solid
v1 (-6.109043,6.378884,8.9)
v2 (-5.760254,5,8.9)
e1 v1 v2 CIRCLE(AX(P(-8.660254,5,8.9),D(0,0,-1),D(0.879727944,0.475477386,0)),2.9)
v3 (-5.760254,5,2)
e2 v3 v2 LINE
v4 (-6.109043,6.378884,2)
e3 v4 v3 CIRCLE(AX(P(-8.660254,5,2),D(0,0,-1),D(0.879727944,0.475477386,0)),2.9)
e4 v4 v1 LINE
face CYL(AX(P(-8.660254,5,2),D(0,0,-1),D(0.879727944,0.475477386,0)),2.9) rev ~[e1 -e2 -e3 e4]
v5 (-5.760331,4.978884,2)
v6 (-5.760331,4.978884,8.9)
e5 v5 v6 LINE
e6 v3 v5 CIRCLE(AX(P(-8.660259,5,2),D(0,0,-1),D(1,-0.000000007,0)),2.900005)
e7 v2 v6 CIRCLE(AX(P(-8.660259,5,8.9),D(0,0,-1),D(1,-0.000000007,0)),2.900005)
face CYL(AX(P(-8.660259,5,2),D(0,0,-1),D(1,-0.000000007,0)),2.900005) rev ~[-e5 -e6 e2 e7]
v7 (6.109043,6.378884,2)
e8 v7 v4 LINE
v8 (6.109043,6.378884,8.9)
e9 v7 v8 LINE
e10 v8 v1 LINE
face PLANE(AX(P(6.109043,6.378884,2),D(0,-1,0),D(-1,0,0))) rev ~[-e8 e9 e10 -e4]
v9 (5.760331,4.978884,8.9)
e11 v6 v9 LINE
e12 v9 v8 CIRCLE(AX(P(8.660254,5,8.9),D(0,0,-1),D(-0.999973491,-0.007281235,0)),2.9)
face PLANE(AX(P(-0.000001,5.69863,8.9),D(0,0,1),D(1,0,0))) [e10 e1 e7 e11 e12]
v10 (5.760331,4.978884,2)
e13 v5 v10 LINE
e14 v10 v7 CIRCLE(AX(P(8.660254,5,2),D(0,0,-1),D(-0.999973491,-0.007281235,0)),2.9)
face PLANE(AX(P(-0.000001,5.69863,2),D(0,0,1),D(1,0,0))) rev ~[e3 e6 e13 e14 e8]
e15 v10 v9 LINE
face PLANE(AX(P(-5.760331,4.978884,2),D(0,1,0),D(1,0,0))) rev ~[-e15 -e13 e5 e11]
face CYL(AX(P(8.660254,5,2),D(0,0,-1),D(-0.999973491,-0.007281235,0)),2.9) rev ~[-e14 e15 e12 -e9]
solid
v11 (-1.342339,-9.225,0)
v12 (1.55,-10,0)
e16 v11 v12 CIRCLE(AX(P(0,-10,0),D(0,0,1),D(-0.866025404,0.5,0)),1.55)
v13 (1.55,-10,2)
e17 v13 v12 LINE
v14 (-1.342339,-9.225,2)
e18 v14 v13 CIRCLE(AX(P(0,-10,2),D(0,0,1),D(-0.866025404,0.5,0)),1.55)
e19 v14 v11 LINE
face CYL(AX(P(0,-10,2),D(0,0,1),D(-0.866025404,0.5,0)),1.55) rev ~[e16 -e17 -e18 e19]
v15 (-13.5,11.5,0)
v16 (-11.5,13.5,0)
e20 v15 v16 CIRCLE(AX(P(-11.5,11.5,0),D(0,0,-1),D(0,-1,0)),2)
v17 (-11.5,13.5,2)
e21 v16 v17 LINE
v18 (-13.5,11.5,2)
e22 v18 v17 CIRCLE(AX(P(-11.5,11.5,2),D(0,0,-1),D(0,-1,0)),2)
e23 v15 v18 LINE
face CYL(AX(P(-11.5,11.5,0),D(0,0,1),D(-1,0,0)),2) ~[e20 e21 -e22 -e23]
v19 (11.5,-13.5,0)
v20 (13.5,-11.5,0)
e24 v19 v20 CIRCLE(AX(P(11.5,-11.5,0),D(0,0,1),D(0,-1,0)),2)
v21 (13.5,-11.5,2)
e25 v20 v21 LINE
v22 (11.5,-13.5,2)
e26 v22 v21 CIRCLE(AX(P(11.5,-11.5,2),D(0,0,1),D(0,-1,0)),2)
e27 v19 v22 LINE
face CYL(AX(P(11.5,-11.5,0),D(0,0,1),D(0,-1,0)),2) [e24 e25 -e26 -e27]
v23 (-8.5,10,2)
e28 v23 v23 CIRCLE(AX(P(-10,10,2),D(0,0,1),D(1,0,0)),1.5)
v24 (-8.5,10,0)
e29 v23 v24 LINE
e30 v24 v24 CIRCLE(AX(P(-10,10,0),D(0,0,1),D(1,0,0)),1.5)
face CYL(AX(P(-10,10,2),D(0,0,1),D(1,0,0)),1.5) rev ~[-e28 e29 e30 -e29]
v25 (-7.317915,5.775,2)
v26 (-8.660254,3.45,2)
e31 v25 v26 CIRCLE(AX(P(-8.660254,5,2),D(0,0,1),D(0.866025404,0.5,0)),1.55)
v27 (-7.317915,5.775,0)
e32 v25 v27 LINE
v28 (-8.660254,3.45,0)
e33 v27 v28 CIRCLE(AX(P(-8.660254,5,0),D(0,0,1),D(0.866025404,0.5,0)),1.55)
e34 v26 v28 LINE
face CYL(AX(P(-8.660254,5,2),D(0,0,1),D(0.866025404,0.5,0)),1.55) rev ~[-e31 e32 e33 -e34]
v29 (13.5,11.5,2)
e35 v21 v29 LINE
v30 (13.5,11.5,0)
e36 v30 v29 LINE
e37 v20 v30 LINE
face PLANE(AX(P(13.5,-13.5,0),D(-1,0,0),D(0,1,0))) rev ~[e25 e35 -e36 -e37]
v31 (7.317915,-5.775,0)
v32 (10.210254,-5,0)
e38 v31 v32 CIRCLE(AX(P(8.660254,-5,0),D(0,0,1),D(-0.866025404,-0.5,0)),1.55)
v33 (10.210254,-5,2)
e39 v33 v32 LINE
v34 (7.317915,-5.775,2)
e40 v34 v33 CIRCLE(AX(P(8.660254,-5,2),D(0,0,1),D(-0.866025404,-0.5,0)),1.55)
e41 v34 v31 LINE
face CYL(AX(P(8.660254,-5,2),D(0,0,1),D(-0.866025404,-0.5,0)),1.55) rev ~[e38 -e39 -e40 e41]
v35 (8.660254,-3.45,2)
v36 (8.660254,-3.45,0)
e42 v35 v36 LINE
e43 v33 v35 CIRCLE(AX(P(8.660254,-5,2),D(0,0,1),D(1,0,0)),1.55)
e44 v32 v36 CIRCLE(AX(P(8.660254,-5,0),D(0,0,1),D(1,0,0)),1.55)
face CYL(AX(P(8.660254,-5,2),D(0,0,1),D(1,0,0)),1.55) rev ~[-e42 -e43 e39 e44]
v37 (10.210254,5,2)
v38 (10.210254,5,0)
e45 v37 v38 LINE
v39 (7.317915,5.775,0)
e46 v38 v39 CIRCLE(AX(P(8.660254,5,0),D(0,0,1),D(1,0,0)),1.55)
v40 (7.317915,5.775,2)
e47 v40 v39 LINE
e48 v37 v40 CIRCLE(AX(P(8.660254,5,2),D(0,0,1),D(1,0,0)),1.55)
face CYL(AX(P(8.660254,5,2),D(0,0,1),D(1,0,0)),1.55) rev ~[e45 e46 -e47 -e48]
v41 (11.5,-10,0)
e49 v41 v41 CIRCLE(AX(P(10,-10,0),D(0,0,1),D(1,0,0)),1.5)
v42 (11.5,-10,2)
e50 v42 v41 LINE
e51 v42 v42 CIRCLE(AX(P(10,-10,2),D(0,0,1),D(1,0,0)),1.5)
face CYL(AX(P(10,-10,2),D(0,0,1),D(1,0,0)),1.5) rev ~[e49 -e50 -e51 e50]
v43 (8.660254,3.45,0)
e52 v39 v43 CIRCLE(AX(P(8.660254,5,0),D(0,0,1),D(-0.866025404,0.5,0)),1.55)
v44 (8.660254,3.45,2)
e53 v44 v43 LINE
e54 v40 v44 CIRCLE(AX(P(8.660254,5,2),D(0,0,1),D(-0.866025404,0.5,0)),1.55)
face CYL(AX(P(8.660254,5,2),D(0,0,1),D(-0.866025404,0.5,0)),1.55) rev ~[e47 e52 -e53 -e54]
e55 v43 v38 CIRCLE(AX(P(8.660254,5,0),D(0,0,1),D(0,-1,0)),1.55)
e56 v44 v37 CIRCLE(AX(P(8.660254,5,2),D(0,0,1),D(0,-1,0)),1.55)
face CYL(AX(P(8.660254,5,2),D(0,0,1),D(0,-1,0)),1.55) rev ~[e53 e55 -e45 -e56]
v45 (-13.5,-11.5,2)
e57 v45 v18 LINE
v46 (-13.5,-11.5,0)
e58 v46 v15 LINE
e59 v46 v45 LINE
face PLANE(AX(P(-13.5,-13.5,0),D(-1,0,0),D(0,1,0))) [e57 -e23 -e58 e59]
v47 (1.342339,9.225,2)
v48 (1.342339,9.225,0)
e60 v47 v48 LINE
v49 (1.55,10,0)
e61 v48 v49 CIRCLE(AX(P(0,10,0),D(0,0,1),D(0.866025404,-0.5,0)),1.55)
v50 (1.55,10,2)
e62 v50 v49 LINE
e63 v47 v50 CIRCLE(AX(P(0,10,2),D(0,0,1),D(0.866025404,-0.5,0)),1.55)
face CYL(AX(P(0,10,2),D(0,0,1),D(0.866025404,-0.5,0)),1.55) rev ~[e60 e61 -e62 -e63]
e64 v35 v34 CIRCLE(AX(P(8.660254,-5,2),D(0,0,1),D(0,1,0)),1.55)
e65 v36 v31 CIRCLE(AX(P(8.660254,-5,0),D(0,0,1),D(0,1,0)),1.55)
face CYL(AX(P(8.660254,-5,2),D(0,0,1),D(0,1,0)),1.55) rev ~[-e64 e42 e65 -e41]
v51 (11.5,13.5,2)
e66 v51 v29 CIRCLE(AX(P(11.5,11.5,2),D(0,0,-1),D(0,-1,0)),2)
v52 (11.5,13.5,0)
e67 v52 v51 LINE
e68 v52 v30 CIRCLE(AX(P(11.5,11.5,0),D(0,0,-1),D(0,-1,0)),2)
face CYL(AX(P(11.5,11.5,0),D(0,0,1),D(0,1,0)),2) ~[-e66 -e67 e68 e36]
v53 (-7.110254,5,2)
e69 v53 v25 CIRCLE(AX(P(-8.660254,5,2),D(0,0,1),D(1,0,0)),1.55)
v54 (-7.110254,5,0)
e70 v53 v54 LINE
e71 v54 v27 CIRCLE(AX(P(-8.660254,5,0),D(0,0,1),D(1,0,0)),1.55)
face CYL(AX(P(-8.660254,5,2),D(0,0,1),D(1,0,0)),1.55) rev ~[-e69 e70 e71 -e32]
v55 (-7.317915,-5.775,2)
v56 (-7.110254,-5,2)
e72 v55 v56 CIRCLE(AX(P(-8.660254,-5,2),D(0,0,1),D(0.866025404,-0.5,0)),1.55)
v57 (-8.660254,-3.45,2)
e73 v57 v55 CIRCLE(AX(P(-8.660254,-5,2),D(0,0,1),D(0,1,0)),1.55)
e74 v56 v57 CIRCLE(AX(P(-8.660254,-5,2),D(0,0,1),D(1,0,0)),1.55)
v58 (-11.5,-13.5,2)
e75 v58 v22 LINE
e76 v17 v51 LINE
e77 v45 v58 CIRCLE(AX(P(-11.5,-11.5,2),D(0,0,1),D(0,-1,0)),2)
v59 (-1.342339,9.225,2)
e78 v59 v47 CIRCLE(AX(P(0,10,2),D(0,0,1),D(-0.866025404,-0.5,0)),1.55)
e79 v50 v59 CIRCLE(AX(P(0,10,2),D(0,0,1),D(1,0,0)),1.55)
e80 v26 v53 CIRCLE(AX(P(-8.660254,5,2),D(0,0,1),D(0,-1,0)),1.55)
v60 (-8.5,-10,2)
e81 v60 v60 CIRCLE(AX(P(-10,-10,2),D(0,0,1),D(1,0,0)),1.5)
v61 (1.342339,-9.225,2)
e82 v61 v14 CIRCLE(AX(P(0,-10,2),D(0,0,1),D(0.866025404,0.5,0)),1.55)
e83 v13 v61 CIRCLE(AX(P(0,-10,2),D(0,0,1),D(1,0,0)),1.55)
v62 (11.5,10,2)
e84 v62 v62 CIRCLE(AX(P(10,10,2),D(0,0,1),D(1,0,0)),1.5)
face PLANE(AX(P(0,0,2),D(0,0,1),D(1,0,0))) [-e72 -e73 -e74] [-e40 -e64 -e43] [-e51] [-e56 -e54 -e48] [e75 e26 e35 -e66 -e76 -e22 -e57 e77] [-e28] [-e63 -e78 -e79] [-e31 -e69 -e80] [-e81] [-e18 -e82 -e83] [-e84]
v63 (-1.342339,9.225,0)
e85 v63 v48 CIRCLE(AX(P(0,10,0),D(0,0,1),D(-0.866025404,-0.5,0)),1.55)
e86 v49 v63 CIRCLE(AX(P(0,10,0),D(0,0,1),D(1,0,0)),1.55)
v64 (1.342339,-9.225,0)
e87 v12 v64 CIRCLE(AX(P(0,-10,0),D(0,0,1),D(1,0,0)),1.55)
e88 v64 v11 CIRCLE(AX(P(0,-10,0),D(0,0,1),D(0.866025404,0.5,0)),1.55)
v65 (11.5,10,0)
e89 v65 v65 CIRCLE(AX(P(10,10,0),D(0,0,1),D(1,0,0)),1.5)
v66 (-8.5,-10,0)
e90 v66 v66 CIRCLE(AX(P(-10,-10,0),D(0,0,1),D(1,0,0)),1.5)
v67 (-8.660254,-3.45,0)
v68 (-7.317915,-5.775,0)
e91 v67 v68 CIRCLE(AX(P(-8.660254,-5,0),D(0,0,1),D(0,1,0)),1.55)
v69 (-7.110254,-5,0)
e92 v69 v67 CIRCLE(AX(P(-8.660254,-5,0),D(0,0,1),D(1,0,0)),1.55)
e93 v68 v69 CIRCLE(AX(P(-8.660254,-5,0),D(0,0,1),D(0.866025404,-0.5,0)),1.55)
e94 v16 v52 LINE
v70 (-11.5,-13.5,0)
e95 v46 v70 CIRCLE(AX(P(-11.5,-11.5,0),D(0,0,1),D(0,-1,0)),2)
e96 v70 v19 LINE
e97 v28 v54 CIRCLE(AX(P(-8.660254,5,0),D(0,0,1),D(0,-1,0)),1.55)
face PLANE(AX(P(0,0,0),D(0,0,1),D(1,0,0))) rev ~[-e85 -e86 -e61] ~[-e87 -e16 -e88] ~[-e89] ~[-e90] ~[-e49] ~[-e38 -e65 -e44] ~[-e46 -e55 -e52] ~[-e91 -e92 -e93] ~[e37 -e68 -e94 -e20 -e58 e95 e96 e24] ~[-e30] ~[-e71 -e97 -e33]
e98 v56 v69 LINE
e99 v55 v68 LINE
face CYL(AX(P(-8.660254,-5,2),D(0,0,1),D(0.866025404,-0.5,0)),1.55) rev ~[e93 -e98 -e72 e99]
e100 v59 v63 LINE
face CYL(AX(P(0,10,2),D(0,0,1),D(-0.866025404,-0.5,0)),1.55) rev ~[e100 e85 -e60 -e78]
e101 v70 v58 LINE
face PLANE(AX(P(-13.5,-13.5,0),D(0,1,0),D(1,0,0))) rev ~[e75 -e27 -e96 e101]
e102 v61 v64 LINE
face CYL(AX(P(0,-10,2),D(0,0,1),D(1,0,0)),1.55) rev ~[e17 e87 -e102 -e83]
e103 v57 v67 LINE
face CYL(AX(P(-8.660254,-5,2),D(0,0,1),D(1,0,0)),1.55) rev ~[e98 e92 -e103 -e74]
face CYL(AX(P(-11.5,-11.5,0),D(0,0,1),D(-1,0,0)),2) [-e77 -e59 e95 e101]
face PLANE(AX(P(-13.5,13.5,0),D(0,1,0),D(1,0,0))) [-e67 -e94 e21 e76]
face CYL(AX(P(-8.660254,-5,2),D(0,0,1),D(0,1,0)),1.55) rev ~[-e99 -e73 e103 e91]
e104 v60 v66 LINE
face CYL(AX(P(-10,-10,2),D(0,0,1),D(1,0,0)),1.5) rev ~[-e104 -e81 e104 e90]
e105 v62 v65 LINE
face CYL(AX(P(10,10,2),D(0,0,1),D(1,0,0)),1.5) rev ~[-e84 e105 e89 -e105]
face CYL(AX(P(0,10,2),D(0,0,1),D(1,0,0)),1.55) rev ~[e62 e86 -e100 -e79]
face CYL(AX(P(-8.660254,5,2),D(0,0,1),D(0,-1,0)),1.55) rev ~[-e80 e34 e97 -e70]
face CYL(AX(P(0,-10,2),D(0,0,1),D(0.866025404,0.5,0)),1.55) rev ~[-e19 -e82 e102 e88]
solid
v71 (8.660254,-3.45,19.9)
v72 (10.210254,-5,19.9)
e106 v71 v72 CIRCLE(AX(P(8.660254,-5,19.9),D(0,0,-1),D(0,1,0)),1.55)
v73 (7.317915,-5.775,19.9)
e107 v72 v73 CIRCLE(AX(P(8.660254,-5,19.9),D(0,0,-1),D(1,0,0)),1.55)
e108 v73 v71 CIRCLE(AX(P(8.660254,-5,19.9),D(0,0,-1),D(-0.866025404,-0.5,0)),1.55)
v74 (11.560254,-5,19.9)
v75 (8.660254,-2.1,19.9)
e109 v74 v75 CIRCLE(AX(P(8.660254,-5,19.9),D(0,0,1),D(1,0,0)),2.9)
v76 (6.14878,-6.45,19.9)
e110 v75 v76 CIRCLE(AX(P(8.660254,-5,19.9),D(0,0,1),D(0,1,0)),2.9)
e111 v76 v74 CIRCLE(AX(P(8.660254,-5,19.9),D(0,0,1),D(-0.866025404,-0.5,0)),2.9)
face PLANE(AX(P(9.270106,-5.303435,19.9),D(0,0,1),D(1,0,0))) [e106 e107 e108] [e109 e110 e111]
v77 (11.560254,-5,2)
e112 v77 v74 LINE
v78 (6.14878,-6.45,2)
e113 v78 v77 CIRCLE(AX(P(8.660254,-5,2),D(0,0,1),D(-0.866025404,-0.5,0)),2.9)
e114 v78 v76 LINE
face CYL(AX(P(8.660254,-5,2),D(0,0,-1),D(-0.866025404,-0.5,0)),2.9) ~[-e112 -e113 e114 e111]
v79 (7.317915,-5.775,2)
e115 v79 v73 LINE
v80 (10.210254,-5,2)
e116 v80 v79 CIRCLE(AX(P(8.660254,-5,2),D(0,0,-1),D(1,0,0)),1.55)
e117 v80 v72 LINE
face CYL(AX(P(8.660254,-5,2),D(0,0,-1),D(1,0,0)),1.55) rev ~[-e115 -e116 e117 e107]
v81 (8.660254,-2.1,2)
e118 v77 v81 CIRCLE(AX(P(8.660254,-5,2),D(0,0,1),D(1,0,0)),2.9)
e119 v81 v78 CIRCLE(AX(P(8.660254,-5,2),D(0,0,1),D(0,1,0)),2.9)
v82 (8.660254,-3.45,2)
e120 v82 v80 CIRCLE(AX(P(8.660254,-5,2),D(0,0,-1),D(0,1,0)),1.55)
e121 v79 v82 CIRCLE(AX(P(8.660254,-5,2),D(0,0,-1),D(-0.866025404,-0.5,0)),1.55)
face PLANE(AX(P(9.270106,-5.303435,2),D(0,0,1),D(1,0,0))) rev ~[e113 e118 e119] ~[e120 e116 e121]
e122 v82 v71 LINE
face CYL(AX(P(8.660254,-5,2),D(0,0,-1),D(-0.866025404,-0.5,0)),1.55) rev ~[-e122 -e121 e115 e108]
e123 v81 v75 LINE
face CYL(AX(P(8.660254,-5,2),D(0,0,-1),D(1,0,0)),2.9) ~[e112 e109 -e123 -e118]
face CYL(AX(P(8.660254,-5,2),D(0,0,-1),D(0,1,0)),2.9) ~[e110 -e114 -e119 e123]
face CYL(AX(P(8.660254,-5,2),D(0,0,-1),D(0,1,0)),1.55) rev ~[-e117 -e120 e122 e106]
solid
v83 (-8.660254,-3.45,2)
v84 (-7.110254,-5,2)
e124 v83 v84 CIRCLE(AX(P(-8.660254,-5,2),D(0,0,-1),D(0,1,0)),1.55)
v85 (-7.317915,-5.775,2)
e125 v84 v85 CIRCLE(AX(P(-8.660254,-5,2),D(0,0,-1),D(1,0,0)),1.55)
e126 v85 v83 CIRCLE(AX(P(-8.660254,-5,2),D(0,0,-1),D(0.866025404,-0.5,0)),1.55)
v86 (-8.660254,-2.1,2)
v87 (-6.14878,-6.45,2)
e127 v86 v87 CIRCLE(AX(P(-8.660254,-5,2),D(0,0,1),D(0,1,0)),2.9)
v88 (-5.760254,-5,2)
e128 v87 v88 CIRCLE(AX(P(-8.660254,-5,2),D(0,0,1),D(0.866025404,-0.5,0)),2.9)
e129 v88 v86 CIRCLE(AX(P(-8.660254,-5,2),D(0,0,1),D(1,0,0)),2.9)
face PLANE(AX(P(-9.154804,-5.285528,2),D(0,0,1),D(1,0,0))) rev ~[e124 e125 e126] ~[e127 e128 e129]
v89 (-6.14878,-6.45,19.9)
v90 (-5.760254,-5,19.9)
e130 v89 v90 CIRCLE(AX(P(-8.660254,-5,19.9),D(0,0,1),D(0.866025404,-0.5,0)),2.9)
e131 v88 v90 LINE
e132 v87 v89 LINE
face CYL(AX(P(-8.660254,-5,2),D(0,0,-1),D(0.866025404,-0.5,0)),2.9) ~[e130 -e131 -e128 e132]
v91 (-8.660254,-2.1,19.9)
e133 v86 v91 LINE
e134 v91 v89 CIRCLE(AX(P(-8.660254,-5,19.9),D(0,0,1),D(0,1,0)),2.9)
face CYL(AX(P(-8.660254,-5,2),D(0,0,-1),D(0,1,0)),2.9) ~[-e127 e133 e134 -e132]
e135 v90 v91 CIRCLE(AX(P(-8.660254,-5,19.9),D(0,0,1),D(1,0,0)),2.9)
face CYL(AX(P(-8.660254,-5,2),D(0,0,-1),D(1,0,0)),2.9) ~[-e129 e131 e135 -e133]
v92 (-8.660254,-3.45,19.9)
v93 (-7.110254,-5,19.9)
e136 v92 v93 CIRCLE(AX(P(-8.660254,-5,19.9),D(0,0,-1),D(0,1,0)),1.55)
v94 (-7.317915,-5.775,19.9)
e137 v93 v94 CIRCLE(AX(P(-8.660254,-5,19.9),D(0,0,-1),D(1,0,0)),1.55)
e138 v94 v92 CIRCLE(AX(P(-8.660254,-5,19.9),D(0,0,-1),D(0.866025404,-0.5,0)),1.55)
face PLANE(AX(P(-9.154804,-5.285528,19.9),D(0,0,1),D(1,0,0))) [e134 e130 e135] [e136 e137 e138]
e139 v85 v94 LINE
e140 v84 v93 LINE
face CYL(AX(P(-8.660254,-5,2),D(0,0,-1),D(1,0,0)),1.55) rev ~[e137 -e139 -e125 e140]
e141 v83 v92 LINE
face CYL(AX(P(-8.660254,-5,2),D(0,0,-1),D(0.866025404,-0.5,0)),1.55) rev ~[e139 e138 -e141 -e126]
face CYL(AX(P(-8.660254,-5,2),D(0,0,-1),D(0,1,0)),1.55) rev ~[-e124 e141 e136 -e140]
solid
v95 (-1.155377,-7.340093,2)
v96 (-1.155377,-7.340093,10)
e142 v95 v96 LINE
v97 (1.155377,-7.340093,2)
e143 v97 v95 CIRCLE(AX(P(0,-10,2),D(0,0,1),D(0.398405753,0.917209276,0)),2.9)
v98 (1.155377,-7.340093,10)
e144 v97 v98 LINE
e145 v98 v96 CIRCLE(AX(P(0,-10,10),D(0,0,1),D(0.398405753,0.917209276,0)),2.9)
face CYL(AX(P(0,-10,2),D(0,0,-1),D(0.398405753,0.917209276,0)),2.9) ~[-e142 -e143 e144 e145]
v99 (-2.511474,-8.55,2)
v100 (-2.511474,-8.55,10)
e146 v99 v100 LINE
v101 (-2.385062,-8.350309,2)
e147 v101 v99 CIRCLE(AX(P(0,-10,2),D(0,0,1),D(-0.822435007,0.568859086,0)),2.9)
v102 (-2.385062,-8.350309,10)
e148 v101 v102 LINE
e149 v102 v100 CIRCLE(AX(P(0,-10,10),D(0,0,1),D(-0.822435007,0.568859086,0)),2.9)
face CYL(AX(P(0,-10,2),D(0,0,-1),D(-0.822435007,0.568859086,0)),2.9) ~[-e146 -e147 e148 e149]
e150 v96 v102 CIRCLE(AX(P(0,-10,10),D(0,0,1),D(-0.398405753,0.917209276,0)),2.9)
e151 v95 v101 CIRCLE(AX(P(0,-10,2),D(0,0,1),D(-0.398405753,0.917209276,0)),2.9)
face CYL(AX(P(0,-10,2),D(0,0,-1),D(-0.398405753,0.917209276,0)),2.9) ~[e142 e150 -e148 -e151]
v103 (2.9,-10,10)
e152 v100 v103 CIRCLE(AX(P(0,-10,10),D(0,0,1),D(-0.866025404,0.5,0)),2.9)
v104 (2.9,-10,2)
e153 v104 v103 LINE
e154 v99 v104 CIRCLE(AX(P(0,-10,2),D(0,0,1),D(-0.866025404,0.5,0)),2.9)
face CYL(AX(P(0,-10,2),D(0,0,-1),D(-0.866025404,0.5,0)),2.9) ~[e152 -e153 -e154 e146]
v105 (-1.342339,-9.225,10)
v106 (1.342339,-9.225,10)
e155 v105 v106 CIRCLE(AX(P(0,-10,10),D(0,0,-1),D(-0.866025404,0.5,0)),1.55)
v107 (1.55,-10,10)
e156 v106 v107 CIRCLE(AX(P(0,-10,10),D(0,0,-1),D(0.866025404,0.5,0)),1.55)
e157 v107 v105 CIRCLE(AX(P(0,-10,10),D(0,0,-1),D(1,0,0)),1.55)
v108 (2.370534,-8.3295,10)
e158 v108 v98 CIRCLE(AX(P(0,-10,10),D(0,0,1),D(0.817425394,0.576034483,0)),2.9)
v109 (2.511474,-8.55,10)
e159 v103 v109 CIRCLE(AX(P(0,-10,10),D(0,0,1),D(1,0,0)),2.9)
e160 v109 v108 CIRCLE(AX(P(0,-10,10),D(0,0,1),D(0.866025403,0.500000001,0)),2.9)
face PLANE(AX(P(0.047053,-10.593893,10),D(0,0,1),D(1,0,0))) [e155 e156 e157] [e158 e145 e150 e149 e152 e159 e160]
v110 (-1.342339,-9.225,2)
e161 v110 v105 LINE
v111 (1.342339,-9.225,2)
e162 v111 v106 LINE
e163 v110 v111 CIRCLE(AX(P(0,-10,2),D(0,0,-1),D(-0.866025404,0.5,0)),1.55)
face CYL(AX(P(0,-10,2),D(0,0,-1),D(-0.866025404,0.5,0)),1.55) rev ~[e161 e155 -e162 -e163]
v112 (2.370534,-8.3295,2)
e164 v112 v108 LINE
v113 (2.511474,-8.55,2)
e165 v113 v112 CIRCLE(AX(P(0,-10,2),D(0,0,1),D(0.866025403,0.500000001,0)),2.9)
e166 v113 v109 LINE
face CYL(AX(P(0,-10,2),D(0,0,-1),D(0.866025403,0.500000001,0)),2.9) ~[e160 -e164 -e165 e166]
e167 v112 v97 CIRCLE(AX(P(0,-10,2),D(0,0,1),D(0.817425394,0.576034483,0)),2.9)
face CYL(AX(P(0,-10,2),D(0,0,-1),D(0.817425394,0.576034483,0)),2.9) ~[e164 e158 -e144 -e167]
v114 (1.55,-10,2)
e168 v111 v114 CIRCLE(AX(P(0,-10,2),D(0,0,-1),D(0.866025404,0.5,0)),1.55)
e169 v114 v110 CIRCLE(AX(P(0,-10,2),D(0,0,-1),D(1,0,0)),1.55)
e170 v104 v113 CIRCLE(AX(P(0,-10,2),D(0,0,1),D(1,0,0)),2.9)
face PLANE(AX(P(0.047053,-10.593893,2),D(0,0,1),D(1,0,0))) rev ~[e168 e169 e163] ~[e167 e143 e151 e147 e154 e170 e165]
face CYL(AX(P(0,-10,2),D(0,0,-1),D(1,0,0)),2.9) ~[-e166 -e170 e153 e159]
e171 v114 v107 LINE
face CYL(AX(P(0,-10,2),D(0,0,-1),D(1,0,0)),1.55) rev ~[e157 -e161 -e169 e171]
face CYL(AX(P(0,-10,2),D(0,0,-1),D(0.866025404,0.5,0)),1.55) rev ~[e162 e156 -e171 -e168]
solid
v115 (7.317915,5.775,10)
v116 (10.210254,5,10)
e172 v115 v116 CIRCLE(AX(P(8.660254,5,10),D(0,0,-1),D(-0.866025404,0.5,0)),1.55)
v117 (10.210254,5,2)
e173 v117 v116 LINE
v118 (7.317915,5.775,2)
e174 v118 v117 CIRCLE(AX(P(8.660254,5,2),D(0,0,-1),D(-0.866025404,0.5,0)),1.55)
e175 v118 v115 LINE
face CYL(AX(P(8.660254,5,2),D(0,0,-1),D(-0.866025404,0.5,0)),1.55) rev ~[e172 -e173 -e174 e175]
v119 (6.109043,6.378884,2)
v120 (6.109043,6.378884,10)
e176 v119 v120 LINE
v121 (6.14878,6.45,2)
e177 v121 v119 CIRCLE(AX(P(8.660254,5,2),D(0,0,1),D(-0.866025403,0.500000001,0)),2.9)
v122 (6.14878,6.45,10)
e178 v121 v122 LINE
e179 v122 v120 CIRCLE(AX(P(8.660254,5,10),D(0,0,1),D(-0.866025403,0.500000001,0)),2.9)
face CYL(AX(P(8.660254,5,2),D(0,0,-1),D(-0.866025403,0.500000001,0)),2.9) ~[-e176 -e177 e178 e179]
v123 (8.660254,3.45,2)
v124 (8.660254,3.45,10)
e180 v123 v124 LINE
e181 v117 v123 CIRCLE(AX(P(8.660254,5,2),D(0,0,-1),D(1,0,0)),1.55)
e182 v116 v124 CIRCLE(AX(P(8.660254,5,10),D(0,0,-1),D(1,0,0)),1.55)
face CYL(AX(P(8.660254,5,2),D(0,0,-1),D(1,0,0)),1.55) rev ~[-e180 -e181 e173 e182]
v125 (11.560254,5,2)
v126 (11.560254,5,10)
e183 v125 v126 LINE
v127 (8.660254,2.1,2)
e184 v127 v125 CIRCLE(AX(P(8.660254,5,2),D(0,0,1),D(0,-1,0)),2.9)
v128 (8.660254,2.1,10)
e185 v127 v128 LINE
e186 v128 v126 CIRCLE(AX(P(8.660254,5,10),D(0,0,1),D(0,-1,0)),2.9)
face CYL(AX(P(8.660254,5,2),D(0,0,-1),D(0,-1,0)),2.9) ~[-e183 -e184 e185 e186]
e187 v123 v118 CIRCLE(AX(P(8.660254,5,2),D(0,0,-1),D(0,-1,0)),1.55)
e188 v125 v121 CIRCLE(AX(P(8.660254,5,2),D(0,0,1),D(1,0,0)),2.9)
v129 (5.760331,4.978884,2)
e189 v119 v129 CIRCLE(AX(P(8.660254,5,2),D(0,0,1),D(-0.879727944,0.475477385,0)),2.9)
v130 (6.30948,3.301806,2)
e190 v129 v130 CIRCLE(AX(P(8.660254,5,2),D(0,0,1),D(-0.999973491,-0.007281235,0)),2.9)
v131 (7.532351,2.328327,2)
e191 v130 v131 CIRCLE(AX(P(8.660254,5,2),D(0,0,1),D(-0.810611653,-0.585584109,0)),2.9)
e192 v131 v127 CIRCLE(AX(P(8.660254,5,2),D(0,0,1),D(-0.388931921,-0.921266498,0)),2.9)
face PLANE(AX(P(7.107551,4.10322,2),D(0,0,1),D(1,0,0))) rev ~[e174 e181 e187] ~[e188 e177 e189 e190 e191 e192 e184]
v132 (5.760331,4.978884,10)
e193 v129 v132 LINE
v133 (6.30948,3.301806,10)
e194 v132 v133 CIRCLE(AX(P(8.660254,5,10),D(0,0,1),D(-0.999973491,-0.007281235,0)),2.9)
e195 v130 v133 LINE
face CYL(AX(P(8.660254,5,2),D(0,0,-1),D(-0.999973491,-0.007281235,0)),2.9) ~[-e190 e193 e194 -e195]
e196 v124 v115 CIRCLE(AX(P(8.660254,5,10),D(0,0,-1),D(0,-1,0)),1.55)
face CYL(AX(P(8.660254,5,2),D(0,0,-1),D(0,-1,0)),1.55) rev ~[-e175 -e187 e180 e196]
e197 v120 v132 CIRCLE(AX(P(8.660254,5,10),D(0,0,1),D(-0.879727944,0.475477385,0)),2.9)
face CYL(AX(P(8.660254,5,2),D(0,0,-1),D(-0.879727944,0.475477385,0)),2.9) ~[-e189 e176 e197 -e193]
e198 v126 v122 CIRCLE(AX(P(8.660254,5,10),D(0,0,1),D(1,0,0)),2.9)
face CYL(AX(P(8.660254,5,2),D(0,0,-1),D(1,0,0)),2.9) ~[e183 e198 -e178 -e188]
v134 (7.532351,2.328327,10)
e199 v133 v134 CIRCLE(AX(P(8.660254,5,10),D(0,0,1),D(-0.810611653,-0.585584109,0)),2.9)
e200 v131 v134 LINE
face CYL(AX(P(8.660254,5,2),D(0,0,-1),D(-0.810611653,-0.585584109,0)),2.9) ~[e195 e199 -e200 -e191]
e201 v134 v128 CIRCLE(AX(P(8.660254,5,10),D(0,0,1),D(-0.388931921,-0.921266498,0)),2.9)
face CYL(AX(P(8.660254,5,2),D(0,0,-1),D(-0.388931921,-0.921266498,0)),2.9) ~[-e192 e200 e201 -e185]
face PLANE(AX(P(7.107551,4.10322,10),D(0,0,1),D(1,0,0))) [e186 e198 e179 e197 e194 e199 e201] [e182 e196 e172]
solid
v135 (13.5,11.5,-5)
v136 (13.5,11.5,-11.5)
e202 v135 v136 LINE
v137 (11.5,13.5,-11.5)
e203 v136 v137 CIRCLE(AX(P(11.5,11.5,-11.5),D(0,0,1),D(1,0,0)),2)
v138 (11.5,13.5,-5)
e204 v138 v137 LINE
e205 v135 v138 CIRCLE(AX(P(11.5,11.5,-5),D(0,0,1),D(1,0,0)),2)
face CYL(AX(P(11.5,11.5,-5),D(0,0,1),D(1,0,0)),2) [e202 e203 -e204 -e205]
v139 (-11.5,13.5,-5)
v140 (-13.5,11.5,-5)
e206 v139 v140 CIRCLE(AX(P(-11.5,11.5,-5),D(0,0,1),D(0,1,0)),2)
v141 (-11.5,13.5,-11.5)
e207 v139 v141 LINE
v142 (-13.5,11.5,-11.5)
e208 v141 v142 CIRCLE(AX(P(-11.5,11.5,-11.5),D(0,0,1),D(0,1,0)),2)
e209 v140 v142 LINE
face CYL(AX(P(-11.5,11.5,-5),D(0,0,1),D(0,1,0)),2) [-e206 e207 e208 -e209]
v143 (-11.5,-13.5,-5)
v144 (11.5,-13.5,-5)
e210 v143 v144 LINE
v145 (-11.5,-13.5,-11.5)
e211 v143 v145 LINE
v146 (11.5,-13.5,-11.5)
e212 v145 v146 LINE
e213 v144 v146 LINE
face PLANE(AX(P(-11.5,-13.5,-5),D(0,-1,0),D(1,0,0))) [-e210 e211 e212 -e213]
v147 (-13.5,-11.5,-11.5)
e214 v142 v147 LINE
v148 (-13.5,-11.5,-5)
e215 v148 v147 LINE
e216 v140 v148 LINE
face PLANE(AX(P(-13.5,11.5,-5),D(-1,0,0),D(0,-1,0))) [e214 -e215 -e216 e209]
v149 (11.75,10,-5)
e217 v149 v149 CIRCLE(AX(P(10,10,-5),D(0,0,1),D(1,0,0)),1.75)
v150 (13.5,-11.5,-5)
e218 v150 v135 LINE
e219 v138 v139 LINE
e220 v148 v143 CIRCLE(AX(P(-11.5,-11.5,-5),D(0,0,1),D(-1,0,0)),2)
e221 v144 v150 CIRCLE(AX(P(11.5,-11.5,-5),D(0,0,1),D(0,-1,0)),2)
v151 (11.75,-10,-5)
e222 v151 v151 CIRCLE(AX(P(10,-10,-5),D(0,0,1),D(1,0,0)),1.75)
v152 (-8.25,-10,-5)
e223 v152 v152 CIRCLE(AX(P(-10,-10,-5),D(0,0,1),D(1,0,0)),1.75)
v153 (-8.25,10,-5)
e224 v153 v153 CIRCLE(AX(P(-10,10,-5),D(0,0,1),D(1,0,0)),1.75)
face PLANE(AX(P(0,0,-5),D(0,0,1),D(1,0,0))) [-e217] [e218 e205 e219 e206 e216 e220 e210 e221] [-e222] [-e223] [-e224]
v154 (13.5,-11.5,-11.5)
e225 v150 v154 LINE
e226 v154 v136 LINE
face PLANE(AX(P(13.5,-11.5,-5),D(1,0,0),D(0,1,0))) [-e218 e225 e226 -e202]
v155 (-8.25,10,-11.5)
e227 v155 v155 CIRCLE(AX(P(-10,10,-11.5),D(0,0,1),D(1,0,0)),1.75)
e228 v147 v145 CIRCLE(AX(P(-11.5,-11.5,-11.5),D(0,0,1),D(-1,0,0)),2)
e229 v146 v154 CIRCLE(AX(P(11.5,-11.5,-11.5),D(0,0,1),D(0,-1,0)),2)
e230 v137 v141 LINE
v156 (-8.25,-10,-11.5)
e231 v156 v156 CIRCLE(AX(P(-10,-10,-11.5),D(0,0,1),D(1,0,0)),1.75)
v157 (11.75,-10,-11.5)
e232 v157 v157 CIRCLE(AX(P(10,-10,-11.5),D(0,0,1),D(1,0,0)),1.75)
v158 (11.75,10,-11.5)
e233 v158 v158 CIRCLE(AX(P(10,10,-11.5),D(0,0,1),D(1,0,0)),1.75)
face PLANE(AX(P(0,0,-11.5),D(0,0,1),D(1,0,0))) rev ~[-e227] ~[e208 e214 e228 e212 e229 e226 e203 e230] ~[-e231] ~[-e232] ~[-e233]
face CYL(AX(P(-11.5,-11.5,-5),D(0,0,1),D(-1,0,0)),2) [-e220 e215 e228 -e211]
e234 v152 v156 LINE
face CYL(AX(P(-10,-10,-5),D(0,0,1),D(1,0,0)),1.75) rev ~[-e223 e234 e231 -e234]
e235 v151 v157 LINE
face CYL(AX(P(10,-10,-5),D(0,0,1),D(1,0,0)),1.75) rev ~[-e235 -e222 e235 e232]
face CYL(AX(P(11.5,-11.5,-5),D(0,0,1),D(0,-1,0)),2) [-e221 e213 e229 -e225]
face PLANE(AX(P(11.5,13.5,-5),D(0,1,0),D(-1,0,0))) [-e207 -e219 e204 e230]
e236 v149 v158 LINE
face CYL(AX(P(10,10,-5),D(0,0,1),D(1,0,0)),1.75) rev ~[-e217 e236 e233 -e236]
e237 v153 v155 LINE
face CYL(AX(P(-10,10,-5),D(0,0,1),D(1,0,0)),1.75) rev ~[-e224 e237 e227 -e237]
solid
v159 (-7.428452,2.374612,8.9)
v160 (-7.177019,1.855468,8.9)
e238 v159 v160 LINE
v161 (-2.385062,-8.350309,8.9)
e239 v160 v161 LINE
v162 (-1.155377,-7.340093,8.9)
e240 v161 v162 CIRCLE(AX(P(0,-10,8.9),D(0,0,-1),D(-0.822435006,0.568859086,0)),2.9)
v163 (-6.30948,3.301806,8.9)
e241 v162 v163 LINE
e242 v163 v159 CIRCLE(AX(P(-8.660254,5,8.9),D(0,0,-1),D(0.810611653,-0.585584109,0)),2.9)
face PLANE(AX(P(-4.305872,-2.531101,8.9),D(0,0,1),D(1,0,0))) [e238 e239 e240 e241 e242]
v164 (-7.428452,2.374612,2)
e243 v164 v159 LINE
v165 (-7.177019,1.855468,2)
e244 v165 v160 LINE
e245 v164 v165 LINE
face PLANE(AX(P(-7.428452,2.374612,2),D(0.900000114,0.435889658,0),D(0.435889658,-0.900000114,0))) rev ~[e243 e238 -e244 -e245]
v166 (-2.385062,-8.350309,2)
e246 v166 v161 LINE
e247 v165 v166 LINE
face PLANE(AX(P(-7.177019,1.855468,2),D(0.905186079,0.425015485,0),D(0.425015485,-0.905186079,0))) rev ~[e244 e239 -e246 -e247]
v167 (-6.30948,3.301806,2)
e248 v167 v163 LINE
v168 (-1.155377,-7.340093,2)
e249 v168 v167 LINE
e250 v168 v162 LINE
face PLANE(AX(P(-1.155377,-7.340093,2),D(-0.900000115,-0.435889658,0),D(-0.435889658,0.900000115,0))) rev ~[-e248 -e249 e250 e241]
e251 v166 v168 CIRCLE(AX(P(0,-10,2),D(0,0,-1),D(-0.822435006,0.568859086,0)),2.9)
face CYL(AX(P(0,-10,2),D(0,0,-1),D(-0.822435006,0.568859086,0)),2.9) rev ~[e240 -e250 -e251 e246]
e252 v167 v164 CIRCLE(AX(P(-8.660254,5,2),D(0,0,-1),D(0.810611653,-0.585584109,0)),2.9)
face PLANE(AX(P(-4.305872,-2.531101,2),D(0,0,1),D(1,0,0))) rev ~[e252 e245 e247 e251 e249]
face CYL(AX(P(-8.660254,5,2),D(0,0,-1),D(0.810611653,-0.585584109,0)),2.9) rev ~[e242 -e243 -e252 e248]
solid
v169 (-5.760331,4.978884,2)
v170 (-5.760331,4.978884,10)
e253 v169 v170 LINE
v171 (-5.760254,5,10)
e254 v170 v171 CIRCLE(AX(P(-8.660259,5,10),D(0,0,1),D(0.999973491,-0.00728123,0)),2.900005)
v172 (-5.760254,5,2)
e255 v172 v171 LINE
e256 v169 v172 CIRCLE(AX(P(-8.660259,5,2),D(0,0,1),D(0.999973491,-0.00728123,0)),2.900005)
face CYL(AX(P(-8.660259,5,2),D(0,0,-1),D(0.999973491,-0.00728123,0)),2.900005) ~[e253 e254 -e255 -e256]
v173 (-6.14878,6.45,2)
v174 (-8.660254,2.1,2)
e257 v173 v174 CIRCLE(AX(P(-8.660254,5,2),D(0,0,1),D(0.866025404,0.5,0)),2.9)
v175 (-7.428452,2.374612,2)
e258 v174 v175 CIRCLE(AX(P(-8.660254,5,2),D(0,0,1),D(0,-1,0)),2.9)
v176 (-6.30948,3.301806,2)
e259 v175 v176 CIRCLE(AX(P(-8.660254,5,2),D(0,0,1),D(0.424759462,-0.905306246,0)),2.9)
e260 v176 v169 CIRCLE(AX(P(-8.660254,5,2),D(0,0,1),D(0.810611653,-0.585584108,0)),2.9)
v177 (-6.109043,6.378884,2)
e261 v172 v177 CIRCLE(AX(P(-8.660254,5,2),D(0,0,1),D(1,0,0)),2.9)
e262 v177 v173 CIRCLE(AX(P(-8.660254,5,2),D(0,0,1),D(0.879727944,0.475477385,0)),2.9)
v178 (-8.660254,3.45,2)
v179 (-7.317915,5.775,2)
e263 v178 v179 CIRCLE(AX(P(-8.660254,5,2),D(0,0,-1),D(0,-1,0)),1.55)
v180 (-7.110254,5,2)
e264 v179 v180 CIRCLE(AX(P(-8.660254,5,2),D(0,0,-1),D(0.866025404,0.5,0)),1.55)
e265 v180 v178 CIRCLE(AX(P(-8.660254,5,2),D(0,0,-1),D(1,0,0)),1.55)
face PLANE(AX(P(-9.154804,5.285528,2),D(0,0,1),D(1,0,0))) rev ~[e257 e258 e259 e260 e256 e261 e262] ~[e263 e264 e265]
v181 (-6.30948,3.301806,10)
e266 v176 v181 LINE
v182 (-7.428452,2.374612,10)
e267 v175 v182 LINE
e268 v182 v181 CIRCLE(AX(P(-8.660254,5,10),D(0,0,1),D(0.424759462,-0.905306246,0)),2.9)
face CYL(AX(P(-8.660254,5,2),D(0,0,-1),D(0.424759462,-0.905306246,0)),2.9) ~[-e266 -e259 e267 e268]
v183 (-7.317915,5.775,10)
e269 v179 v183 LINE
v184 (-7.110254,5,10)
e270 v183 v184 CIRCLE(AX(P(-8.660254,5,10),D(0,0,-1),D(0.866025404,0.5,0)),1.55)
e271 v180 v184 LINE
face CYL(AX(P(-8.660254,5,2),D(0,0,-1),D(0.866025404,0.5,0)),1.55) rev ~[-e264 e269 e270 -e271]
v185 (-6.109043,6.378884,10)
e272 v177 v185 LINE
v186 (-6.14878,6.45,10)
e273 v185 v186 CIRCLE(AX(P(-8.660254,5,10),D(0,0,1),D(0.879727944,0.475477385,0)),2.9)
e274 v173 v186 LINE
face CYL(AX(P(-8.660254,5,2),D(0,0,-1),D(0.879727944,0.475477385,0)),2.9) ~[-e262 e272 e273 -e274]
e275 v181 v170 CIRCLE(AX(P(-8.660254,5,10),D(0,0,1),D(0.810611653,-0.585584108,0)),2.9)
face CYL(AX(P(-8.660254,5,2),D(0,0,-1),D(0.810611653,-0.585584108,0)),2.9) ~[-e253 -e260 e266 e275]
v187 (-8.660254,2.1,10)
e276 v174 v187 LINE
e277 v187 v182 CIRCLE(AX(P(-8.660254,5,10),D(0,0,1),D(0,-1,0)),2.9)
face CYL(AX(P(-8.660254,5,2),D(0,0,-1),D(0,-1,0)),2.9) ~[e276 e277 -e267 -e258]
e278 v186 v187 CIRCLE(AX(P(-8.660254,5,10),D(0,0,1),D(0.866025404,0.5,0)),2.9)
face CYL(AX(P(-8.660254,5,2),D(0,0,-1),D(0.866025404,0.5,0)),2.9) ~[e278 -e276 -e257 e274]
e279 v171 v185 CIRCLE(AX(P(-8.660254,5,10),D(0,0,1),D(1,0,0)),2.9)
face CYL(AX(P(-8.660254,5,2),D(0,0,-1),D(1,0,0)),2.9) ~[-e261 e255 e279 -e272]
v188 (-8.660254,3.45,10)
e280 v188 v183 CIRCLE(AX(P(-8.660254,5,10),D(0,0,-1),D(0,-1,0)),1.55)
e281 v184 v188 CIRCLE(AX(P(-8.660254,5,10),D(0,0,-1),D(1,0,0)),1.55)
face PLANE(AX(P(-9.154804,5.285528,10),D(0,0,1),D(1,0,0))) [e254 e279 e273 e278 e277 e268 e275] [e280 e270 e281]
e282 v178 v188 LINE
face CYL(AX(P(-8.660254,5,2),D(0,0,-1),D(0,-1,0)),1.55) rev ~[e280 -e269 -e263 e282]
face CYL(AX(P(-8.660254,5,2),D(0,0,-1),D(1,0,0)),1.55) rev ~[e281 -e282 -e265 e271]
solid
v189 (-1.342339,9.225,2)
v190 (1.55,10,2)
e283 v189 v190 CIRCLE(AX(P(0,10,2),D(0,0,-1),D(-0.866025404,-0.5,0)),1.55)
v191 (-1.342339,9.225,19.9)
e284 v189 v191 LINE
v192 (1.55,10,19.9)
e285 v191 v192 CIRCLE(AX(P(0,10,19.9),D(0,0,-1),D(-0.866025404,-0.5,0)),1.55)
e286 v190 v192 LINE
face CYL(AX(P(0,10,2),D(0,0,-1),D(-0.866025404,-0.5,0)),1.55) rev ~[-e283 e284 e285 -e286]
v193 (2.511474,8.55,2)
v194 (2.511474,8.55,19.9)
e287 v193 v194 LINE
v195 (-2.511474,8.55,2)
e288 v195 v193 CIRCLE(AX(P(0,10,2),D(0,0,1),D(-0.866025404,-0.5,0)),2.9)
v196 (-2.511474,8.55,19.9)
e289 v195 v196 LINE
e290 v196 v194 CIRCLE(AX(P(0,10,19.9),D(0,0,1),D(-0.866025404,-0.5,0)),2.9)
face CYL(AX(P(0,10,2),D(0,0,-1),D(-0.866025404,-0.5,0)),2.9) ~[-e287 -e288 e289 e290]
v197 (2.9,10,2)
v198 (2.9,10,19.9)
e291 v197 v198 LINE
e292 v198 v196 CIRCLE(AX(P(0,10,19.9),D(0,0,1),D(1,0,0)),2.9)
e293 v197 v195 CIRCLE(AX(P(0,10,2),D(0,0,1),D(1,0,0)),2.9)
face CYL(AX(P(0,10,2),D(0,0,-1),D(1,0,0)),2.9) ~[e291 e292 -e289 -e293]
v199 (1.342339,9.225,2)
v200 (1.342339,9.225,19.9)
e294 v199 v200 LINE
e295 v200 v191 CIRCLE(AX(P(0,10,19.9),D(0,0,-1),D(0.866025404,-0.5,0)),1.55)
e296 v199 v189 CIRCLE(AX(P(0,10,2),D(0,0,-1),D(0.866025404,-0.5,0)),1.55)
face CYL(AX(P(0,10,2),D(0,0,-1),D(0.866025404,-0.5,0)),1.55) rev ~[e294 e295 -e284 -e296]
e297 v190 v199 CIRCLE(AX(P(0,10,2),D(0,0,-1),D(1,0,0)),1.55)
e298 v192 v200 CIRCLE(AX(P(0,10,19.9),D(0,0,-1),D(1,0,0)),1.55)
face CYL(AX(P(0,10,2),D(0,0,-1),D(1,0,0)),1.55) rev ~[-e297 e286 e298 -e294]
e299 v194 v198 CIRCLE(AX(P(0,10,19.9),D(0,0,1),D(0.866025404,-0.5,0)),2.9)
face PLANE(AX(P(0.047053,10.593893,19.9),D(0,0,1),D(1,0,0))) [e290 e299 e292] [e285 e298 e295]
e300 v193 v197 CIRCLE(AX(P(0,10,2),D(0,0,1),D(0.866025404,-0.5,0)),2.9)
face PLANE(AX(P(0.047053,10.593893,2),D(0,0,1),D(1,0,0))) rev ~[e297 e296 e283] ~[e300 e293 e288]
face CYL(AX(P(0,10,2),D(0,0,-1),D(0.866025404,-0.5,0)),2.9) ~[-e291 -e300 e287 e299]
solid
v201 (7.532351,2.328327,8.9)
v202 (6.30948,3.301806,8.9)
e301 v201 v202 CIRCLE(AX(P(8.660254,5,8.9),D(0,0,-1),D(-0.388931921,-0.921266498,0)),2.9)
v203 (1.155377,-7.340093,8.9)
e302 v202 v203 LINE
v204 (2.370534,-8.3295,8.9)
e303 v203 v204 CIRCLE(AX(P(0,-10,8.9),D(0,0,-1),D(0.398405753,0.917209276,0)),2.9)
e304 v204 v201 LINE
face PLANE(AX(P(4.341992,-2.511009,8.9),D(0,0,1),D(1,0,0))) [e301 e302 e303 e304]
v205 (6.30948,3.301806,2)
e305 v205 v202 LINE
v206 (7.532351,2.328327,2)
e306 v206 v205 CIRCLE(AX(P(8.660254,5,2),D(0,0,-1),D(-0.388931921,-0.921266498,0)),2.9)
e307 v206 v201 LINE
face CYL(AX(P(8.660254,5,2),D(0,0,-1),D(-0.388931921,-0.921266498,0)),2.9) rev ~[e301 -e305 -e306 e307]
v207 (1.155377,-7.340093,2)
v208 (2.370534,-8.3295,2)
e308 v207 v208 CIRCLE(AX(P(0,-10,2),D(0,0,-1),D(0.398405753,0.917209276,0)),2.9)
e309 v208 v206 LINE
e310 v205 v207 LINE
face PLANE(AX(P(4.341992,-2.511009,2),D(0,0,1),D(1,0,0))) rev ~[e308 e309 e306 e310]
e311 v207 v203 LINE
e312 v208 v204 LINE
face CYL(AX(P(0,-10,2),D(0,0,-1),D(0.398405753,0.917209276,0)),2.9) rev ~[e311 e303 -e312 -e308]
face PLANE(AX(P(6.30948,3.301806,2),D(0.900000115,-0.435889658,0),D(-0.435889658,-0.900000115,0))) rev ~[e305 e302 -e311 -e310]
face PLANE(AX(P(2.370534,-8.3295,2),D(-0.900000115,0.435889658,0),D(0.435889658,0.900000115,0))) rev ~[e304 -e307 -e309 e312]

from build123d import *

# Parameters (mm, degrees)
F0_W      = 27
F0_H      = 27
F1_DEPTH  = 2
F2_R      = 1.5
F3_DEPTH  = 5
F4_R      = 2
F7_DEPTH  = 17.9
F8_DEPTH  = 8
F9_DEPTH  = 2
F11_DEPTH = 6.9
F13_R     = 1.75
F14_DEPTH = 6.5


# Not quite as in the source:
# - the program builds the solid bodies; features that only make, move or delete a surface that nothing else refers to are left out


with BuildPart() as f1:
    # F0 (on Top) → F1 (new body)
    with BuildSketch(Plane.XY):
        Rectangle(F0_W, F0_H)
    extrude(amount=F1_DEPTH)

    # F2 (on face) → F3 (cut)
    with BuildSketch(Plane.XY.offset(2)):
        with Locations((-10, 10)):
            Circle(F2_R)
        with Locations((10, 10)):
            Circle(F2_R)
        with Locations((10, -10)):
            Circle(F2_R)
        with Locations((-10, -10)):
            Circle(F2_R)
    extrude(amount=-F3_DEPTH, mode=Mode.SUBTRACT)

    # F4
    f4_edges = [f1.edges().sort_by_distance(p)[0] for p in [
        (13.5, -13.5, 1),
        (-13.5, 13.5, 1),
        (13.5, 13.5, 1),
        (-13.5, -13.5, 1),
    ]]
    fillet(f4_edges, radius=F4_R)

    # F6 (on face) → F9 (cut)
    with BuildSketch(Plane.XY.offset(2)):
        with BuildLine():
            Line((8.6602540378, -5), (7.317914662, -5.775))
            ThreePointArc((7.317914662, -5.775), (9.0614235578, -6.4971850307), (10.2102540378, -5))
            ThreePointArc((10.2102540378, -5), (9.7562695487, -3.9039844892), (8.6602540378, -3.45))
            Line((8.6602540378, -3.45), (8.6602540378, -5))
        make_face()
        with BuildLine():
            ThreePointArc((8.6602540378, -3.45), (7.317914662, -4.225), (7.317914662, -5.775))
            Line((7.317914662, -5.775), (8.6602540378, -5))
            Line((8.6602540378, -5), (8.6602540378, -3.45))
        make_face()
        with BuildLine():
            ThreePointArc((1.55, 10), (-0.4011695199, 11.4971850307), (-1.3423393759, 9.225))
            Line((-1.3423393759, 9.225), (0, 10))
            Line((0, 10), (1.3423393759, 9.225))
            ThreePointArc((1.3423393759, 9.225), (1.4971850307, 9.5988304801), (1.55, 10))
        make_face()
        with BuildLine():
            Line((0, 10), (-1.3423393759, 9.225))
            ThreePointArc((-1.3423393759, 9.225), (0, 8.45), (1.3423393759, 9.225))
            Line((1.3423393759, 9.225), (0, 10))
        make_face()
        with BuildLine():
            ThreePointArc((7.317914662, 5.775), (7.317914662, 4.225), (8.6602540378, 3.45))
            Line((8.6602540378, 3.45), (8.6602540378, 5))
            Line((8.6602540378, 5), (7.317914662, 5.775))
        make_face()
        with BuildLine():
            Line((8.6602540378, 5), (8.6602540378, 3.45))
            ThreePointArc((8.6602540378, 3.45), (9.7562695487, 3.9039844892), (10.2102540378, 5))
            ThreePointArc((10.2102540378, 5), (9.0614235578, 6.4971850307), (7.317914662, 5.775))
            Line((7.317914662, 5.775), (8.6602540378, 5))
        make_face()
        with BuildLine():
            ThreePointArc((-7.317914662, 5.775), (-10.0025934137, 5.775), (-8.6602540378, 3.45))
            Line((-8.6602540378, 3.45), (-8.6602540378, 5))
            Line((-8.6602540378, 5), (-7.317914662, 5.775))
        make_face()
        with BuildLine():
            Line((-8.6602540378, 5), (-8.6602540378, 3.45))
            ThreePointArc((-8.6602540378, 3.45), (-7.564238527, 3.9039844892), (-7.1102540378, 5))
            ThreePointArc((-7.1102540378, 5), (-7.1630690071, 5.4011695199), (-7.317914662, 5.775))
            Line((-7.317914662, 5.775), (-8.6602540378, 5))
        make_face()
        with BuildLine():
            ThreePointArc((-8.6602540378, -3.45), (-10.0025934137, -5.775), (-7.317914662, -5.775))
            Line((-7.317914662, -5.775), (-8.6602540378, -5))
            Line((-8.6602540378, -5), (-8.6602540378, -3.45))
        make_face()
        with BuildLine():
            Line((-8.6602540378, -5), (-7.317914662, -5.775))
            ThreePointArc((-7.317914662, -5.775), (-7.1630690071, -5.4011695199), (-7.1102540378, -5))
            ThreePointArc((-7.1102540378, -5), (-7.564238527, -3.9039844892), (-8.6602540378, -3.45))
            Line((-8.6602540378, -3.45), (-8.6602540378, -5))
        make_face()
        with BuildLine():
            Line((-1.3423393759, -9.225), (0, -10))
            Line((0, -10), (1.3423393759, -9.225))
            ThreePointArc((1.3423393759, -9.225), (0, -8.45), (-1.3423393759, -9.225))
        make_face()
        with BuildLine():
            Line((1.3423393759, -9.225), (0, -10))
            Line((0, -10), (-1.3423393759, -9.225))
            ThreePointArc((-1.3423393759, -9.225), (-0.4011695199, -11.4971850307), (1.55, -10))
            ThreePointArc((1.55, -10), (1.4971850307, -9.5988304801), (1.3423393759, -9.225))
        make_face()
    extrude(amount=-F9_DEPTH, mode=Mode.SUBTRACT)


with BuildPart() as f7:
    # F6 (on face) → F7 (new body)
    with BuildSketch(Plane.XY.offset(2)):
        with BuildLine():
            ThreePointArc((2.9, 10), (-0.7505752308, 12.8011848962), (-2.511473671, 8.55))
            Line((-2.511473671, 8.55), (-1.3423393759, 9.225))
            ThreePointArc((-1.3423393759, 9.225), (-0.4011695199, 11.4971850307), (1.55, 10))
            ThreePointArc((1.55, 10), (1.4971850307, 9.5988304801), (1.3423393759, 9.225))
            Line((1.3423393759, 9.225), (2.511473671, 8.55))
            ThreePointArc((2.511473671, 8.55), (2.8011848962, 9.2494247692), (2.9, 10))
        make_face()
        with BuildLine():
            Line((-1.3423393759, 9.225), (-2.511473671, 8.55))
            ThreePointArc((-2.511473671, 8.55), (0, 7.1), (2.511473671, 8.55))
            Line((2.511473671, 8.55), (1.3423393759, 9.225))
            ThreePointArc((1.3423393759, 9.225), (0, 8.45), (-1.3423393759, 9.225))
        make_face()
    extrude(amount=F7_DEPTH)


with BuildPart() as f7b:
    # F6 (on face) → F7, piece 2 (new body)
    with BuildSketch(Plane.XY.offset(2)):
        with BuildLine():
            Line((7.317914662, -5.775), (6.1487803669, -6.45))
            ThreePointArc((6.1487803669, -6.45), (9.4108292686, -7.8011848962), (11.5602540378, -5))
            ThreePointArc((11.5602540378, -5), (10.7108637033, -2.9493903346), (8.6602540378, -2.1))
            Line((8.6602540378, -2.1), (8.6602540378, -3.45))
            ThreePointArc((8.6602540378, -3.45), (9.7562695487, -3.9039844892), (10.2102540378, -5))
            ThreePointArc((10.2102540378, -5), (9.0614235578, -6.4971850307), (7.317914662, -5.775))
        make_face()
        with BuildLine():
            ThreePointArc((8.6602540378, -2.1), (6.1487803669, -3.55), (6.1487803669, -6.45))
            Line((6.1487803669, -6.45), (7.317914662, -5.775))
            ThreePointArc((7.317914662, -5.775), (7.317914662, -4.225), (8.6602540378, -3.45))
            Line((8.6602540378, -3.45), (8.6602540378, -2.1))
        make_face()
    extrude(amount=F7_DEPTH)


with BuildPart() as f7c:
    # F6 (on face) → F7, piece 3 (new body)
    with BuildSketch(Plane.XY.offset(2)):
        with BuildLine():
            ThreePointArc((-8.6602540378, -2.1), (-11.1717277088, -6.45), (-6.1487803669, -6.45))
            Line((-6.1487803669, -6.45), (-7.317914662, -5.775))
            ThreePointArc((-7.317914662, -5.775), (-10.0025934137, -5.775), (-8.6602540378, -3.45))
            Line((-8.6602540378, -3.45), (-8.6602540378, -2.1))
        make_face()
        with BuildLine():
            Line((-7.317914662, -5.775), (-6.1487803669, -6.45))
            ThreePointArc((-6.1487803669, -6.45), (-5.8590691416, -5.7505752308), (-5.7602540378, -5))
            ThreePointArc((-5.7602540378, -5), (-6.6096443724, -2.9493903346), (-8.6602540378, -2.1))
            Line((-8.6602540378, -2.1), (-8.6602540378, -3.45))
            ThreePointArc((-8.6602540378, -3.45), (-7.564238527, -3.9039844892), (-7.1102540378, -5))
            ThreePointArc((-7.1102540378, -5), (-7.1630690071, -5.4011695199), (-7.317914662, -5.775))
        make_face()
    extrude(amount=F7_DEPTH)


with BuildPart() as f8:
    # F6 (on face) → F8 (new body)
    with BuildSketch(Plane.XY.offset(2)):
        with BuildLine():
            ThreePointArc((-6.1487803669, 6.45), (-11.1717277088, 6.45), (-8.6602540378, 2.1))
            Line((-8.6602540378, 2.1), (-8.6602540378, 3.45))
            ThreePointArc((-8.6602540378, 3.45), (-10.0025934137, 5.775), (-7.317914662, 5.775))
            Line((-7.317914662, 5.775), (-6.1487803669, 6.45))
        make_face()
        with BuildLine():
            Line((-8.6602540378, 3.45), (-8.6602540378, 2.1))
            ThreePointArc((-8.6602540378, 2.1), (-8.0292332503, 2.1694854239), (-7.4284515985, 2.3746118857))
            ThreePointArc((-7.4284515985, 2.3746118857), (-6.8099472018, 2.7669830694), (-6.3094802441, 3.3018060856))
            ThreePointArc((-6.3094802441, 3.3018060856), (-5.9042419792, 4.0975602331), (-5.7603309126, 4.9788844183))
            ThreePointArc((-5.7603309126, 4.9788844183), (-5.7602732566, 4.9894421392), (-5.7602540378, 5))
            ThreePointArc((-5.7602540378, 5), (-5.8488031659, 5.7111568004), (-6.1090429997, 6.3788844183))
            ThreePointArc((-6.1090429997, 6.3788844183), (-6.1286619553, 6.4145817501), (-6.1487803669, 6.45))
            Line((-6.1487803669, 6.45), (-7.317914662, 5.775))
            ThreePointArc((-7.317914662, 5.775), (-7.1630690071, 5.4011695199), (-7.1102540378, 5))
            ThreePointArc((-7.1102540378, 5), (-7.564238527, 3.9039844892), (-8.6602540378, 3.45))
        make_face()
    extrude(amount=F8_DEPTH)


with BuildPart() as f8b:
    # F6 (on face) → F8, piece 2 (new body)
    with BuildSketch(Plane.XY.offset(2)):
        with BuildLine():
            ThreePointArc((6.3094802441, 3.3018060856), (6.8540944049, 2.7311264072), (7.5323514668, 2.3283271551))
            ThreePointArc((7.5323514668, 2.3283271551), (8.0848634098, 2.1576549075), (8.6602540378, 2.1))
            Line((8.6602540378, 2.1), (8.6602540378, 3.45))
            ThreePointArc((8.6602540378, 3.45), (7.317914662, 4.225), (7.317914662, 5.775))
            Line((7.317914662, 5.775), (6.1487803669, 6.45))
            ThreePointArc((6.1487803669, 6.45), (6.1286619553, 6.4145817501), (6.1090429997, 6.3788844183))
            ThreePointArc((6.1090429997, 6.3788844183), (5.8462327308, 5.7009166023), (5.7603309126, 4.9788844183))
            ThreePointArc((5.7603309126, 4.9788844183), (5.9042419792, 4.0975602331), (6.3094802441, 3.3018060856))
        make_face()
        with BuildLine():
            Line((8.6602540378, 3.45), (8.6602540378, 2.1))
            ThreePointArc((8.6602540378, 2.1), (10.7108637033, 2.9493903346), (11.5602540378, 5))
            ThreePointArc((11.5602540378, 5), (9.4108292686, 7.8011848962), (6.1487803669, 6.45))
            Line((6.1487803669, 6.45), (7.317914662, 5.775))
            ThreePointArc((7.317914662, 5.775), (9.0614235578, 6.4971850307), (10.2102540378, 5))
            ThreePointArc((10.2102540378, 5), (9.7562695487, 3.9039844892), (8.6602540378, 3.45))
        make_face()
    extrude(amount=F8_DEPTH)


with BuildPart() as f8c:
    # F6 (on face) → F8, piece 3 (new body)
    with BuildSketch(Plane.XY.offset(2)):
        with BuildLine():
            ThreePointArc((1.55, -10), (-0.4011695199, -11.4971850307), (-1.3423393759, -9.225))
            Line((-1.3423393759, -9.225), (-2.511473671, -8.55))
            ThreePointArc((-2.511473671, -8.55), (-0.7505752308, -12.8011848962), (2.9, -10))
            ThreePointArc((2.9, -10), (2.8011848962, -9.2494247692), (2.511473671, -8.55))
            Line((2.511473671, -8.55), (1.3423393759, -9.225))
            ThreePointArc((1.3423393759, -9.225), (1.4971850307, -9.5988304801), (1.55, -10))
        make_face()
        with BuildLine():
            Line((-2.511473671, -8.55), (-1.3423393759, -9.225))
            ThreePointArc((-1.3423393759, -9.225), (0, -8.45), (1.3423393759, -9.225))
            Line((1.3423393759, -9.225), (2.511473671, -8.55))
            ThreePointArc((2.511473671, -8.55), (2.4434921556, -8.4381593918), (2.3705336425, -8.3295))
            ThreePointArc((2.3705336425, -8.3295), (1.8310495376, -7.7511652816), (1.1553766827, -7.3400930992))
            ThreePointArc((1.1553766827, -7.3400930992), (0, -7.1), (-1.1553766827, -7.3400930992))
            ThreePointArc((-1.1553766827, -7.3400930992), (-1.8408719481, -7.759198699), (-2.3850615189, -8.3503086497))
            ThreePointArc((-2.3850615189, -8.3503086497), (-2.4503027109, -8.4488660197), (-2.511473671, -8.55))
        make_face()
    extrude(amount=F8_DEPTH)


with BuildPart() as f11:
    # F6 (on face) → F11 (new body)
    with BuildSketch(Plane.XY.offset(2)):
        with BuildLine():
            Line((-7.1770187587, 1.855467693), (-2.3850615189, -8.3503086497))
            ThreePointArc((-2.3850615189, -8.3503086497), (-1.8408719481, -7.759198699), (-1.1553766827, -7.3400930992))
            Line((-1.1553766827, -7.3400930992), (-6.3094802441, 3.3018060856))
            ThreePointArc((-6.3094802441, 3.3018060856), (-6.8099472018, 2.7669830694), (-7.4284515985, 2.3746118857))
            Line((-7.4284515985, 2.3746118857), (-7.1770187587, 1.855467693))
        make_face()
    extrude(amount=F11_DEPTH)


with BuildPart() as f11b:
    # F6 (on face) → F11, piece 2 (new body)
    with BuildSketch(Plane.XY.offset(2)):
        with BuildLine():
            ThreePointArc((-5.7602540378, 5), (-5.7602732566, 4.9894421392), (-5.7603309126, 4.9788844183))
            Line((-5.7603309126, 4.9788844183), (5.7603309126, 4.9788844183))
            ThreePointArc((5.7603309126, 4.9788844183), (5.8462327308, 5.7009166023), (6.1090429997, 6.3788844183))
            Line((6.1090429997, 6.3788844183), (0, 6.3788844183))
            Line((0, 6.3788844183), (-6.1090429997, 6.3788844183))
            ThreePointArc((-6.1090429997, 6.3788844183), (-5.8488031659, 5.7111568004), (-5.7602540378, 5))
        make_face()
    extrude(amount=F11_DEPTH)


with BuildPart() as f11c:
    # F6 (on face) → F11, piece 3 (new body)
    with BuildSketch(Plane.XY.offset(2)):
        with BuildLine():
            ThreePointArc((1.1553766827, -7.3400930992), (1.8310495376, -7.7511652816), (2.3705336425, -8.3295))
            Line((2.3705336425, -8.3295), (7.5323514668, 2.3283271551))
            ThreePointArc((7.5323514668, 2.3283271551), (6.8540944049, 2.7311264072), (6.3094802441, 3.3018060856))
            Line((6.3094802441, 3.3018060856), (1.1553766827, -7.3400930992))
        make_face()
    extrude(amount=F11_DEPTH)


with BuildPart() as f14:
    # F13 (on offset) → F14 (new body)
    with BuildSketch(Plane.XY.offset(-5)):
        with BuildLine():
            Line((-11.5, -13.5), (11.5, -13.5))
            ThreePointArc((11.5, -13.5), (12.9142135624, -12.9142135624), (13.5, -11.5))
            Line((13.5, -11.5), (13.5, 11.5))
            ThreePointArc((13.5, 11.5), (12.9142135624, 12.9142135624), (11.5, 13.5))
            Line((11.5, 13.5), (-11.5, 13.5))
            ThreePointArc((-11.5, 13.5), (-12.9142135624, 12.9142135624), (-13.5, 11.5))
            Line((-13.5, 11.5), (-13.5, -11.5))
            ThreePointArc((-13.5, -11.5), (-12.9142135624, -12.9142135624), (-11.5, -13.5))
        make_face()
        with Locations((-10, -10)):
            Circle(F13_R, mode=Mode.SUBTRACT)
        with Locations((10, -10)):
            Circle(F13_R, mode=Mode.SUBTRACT)
        with Locations((-10, 10)):
            Circle(F13_R, mode=Mode.SUBTRACT)
        with Locations((10, 10)):
            Circle(F13_R, mode=Mode.SUBTRACT)
    extrude(amount=-F14_DEPTH)


solid = Compound([f1.part, f7.part, f7b.part, f7c.part, f8.part, f8b.part, f8c.part, f11.part, f11b.part, f11c.part, f14.part])
